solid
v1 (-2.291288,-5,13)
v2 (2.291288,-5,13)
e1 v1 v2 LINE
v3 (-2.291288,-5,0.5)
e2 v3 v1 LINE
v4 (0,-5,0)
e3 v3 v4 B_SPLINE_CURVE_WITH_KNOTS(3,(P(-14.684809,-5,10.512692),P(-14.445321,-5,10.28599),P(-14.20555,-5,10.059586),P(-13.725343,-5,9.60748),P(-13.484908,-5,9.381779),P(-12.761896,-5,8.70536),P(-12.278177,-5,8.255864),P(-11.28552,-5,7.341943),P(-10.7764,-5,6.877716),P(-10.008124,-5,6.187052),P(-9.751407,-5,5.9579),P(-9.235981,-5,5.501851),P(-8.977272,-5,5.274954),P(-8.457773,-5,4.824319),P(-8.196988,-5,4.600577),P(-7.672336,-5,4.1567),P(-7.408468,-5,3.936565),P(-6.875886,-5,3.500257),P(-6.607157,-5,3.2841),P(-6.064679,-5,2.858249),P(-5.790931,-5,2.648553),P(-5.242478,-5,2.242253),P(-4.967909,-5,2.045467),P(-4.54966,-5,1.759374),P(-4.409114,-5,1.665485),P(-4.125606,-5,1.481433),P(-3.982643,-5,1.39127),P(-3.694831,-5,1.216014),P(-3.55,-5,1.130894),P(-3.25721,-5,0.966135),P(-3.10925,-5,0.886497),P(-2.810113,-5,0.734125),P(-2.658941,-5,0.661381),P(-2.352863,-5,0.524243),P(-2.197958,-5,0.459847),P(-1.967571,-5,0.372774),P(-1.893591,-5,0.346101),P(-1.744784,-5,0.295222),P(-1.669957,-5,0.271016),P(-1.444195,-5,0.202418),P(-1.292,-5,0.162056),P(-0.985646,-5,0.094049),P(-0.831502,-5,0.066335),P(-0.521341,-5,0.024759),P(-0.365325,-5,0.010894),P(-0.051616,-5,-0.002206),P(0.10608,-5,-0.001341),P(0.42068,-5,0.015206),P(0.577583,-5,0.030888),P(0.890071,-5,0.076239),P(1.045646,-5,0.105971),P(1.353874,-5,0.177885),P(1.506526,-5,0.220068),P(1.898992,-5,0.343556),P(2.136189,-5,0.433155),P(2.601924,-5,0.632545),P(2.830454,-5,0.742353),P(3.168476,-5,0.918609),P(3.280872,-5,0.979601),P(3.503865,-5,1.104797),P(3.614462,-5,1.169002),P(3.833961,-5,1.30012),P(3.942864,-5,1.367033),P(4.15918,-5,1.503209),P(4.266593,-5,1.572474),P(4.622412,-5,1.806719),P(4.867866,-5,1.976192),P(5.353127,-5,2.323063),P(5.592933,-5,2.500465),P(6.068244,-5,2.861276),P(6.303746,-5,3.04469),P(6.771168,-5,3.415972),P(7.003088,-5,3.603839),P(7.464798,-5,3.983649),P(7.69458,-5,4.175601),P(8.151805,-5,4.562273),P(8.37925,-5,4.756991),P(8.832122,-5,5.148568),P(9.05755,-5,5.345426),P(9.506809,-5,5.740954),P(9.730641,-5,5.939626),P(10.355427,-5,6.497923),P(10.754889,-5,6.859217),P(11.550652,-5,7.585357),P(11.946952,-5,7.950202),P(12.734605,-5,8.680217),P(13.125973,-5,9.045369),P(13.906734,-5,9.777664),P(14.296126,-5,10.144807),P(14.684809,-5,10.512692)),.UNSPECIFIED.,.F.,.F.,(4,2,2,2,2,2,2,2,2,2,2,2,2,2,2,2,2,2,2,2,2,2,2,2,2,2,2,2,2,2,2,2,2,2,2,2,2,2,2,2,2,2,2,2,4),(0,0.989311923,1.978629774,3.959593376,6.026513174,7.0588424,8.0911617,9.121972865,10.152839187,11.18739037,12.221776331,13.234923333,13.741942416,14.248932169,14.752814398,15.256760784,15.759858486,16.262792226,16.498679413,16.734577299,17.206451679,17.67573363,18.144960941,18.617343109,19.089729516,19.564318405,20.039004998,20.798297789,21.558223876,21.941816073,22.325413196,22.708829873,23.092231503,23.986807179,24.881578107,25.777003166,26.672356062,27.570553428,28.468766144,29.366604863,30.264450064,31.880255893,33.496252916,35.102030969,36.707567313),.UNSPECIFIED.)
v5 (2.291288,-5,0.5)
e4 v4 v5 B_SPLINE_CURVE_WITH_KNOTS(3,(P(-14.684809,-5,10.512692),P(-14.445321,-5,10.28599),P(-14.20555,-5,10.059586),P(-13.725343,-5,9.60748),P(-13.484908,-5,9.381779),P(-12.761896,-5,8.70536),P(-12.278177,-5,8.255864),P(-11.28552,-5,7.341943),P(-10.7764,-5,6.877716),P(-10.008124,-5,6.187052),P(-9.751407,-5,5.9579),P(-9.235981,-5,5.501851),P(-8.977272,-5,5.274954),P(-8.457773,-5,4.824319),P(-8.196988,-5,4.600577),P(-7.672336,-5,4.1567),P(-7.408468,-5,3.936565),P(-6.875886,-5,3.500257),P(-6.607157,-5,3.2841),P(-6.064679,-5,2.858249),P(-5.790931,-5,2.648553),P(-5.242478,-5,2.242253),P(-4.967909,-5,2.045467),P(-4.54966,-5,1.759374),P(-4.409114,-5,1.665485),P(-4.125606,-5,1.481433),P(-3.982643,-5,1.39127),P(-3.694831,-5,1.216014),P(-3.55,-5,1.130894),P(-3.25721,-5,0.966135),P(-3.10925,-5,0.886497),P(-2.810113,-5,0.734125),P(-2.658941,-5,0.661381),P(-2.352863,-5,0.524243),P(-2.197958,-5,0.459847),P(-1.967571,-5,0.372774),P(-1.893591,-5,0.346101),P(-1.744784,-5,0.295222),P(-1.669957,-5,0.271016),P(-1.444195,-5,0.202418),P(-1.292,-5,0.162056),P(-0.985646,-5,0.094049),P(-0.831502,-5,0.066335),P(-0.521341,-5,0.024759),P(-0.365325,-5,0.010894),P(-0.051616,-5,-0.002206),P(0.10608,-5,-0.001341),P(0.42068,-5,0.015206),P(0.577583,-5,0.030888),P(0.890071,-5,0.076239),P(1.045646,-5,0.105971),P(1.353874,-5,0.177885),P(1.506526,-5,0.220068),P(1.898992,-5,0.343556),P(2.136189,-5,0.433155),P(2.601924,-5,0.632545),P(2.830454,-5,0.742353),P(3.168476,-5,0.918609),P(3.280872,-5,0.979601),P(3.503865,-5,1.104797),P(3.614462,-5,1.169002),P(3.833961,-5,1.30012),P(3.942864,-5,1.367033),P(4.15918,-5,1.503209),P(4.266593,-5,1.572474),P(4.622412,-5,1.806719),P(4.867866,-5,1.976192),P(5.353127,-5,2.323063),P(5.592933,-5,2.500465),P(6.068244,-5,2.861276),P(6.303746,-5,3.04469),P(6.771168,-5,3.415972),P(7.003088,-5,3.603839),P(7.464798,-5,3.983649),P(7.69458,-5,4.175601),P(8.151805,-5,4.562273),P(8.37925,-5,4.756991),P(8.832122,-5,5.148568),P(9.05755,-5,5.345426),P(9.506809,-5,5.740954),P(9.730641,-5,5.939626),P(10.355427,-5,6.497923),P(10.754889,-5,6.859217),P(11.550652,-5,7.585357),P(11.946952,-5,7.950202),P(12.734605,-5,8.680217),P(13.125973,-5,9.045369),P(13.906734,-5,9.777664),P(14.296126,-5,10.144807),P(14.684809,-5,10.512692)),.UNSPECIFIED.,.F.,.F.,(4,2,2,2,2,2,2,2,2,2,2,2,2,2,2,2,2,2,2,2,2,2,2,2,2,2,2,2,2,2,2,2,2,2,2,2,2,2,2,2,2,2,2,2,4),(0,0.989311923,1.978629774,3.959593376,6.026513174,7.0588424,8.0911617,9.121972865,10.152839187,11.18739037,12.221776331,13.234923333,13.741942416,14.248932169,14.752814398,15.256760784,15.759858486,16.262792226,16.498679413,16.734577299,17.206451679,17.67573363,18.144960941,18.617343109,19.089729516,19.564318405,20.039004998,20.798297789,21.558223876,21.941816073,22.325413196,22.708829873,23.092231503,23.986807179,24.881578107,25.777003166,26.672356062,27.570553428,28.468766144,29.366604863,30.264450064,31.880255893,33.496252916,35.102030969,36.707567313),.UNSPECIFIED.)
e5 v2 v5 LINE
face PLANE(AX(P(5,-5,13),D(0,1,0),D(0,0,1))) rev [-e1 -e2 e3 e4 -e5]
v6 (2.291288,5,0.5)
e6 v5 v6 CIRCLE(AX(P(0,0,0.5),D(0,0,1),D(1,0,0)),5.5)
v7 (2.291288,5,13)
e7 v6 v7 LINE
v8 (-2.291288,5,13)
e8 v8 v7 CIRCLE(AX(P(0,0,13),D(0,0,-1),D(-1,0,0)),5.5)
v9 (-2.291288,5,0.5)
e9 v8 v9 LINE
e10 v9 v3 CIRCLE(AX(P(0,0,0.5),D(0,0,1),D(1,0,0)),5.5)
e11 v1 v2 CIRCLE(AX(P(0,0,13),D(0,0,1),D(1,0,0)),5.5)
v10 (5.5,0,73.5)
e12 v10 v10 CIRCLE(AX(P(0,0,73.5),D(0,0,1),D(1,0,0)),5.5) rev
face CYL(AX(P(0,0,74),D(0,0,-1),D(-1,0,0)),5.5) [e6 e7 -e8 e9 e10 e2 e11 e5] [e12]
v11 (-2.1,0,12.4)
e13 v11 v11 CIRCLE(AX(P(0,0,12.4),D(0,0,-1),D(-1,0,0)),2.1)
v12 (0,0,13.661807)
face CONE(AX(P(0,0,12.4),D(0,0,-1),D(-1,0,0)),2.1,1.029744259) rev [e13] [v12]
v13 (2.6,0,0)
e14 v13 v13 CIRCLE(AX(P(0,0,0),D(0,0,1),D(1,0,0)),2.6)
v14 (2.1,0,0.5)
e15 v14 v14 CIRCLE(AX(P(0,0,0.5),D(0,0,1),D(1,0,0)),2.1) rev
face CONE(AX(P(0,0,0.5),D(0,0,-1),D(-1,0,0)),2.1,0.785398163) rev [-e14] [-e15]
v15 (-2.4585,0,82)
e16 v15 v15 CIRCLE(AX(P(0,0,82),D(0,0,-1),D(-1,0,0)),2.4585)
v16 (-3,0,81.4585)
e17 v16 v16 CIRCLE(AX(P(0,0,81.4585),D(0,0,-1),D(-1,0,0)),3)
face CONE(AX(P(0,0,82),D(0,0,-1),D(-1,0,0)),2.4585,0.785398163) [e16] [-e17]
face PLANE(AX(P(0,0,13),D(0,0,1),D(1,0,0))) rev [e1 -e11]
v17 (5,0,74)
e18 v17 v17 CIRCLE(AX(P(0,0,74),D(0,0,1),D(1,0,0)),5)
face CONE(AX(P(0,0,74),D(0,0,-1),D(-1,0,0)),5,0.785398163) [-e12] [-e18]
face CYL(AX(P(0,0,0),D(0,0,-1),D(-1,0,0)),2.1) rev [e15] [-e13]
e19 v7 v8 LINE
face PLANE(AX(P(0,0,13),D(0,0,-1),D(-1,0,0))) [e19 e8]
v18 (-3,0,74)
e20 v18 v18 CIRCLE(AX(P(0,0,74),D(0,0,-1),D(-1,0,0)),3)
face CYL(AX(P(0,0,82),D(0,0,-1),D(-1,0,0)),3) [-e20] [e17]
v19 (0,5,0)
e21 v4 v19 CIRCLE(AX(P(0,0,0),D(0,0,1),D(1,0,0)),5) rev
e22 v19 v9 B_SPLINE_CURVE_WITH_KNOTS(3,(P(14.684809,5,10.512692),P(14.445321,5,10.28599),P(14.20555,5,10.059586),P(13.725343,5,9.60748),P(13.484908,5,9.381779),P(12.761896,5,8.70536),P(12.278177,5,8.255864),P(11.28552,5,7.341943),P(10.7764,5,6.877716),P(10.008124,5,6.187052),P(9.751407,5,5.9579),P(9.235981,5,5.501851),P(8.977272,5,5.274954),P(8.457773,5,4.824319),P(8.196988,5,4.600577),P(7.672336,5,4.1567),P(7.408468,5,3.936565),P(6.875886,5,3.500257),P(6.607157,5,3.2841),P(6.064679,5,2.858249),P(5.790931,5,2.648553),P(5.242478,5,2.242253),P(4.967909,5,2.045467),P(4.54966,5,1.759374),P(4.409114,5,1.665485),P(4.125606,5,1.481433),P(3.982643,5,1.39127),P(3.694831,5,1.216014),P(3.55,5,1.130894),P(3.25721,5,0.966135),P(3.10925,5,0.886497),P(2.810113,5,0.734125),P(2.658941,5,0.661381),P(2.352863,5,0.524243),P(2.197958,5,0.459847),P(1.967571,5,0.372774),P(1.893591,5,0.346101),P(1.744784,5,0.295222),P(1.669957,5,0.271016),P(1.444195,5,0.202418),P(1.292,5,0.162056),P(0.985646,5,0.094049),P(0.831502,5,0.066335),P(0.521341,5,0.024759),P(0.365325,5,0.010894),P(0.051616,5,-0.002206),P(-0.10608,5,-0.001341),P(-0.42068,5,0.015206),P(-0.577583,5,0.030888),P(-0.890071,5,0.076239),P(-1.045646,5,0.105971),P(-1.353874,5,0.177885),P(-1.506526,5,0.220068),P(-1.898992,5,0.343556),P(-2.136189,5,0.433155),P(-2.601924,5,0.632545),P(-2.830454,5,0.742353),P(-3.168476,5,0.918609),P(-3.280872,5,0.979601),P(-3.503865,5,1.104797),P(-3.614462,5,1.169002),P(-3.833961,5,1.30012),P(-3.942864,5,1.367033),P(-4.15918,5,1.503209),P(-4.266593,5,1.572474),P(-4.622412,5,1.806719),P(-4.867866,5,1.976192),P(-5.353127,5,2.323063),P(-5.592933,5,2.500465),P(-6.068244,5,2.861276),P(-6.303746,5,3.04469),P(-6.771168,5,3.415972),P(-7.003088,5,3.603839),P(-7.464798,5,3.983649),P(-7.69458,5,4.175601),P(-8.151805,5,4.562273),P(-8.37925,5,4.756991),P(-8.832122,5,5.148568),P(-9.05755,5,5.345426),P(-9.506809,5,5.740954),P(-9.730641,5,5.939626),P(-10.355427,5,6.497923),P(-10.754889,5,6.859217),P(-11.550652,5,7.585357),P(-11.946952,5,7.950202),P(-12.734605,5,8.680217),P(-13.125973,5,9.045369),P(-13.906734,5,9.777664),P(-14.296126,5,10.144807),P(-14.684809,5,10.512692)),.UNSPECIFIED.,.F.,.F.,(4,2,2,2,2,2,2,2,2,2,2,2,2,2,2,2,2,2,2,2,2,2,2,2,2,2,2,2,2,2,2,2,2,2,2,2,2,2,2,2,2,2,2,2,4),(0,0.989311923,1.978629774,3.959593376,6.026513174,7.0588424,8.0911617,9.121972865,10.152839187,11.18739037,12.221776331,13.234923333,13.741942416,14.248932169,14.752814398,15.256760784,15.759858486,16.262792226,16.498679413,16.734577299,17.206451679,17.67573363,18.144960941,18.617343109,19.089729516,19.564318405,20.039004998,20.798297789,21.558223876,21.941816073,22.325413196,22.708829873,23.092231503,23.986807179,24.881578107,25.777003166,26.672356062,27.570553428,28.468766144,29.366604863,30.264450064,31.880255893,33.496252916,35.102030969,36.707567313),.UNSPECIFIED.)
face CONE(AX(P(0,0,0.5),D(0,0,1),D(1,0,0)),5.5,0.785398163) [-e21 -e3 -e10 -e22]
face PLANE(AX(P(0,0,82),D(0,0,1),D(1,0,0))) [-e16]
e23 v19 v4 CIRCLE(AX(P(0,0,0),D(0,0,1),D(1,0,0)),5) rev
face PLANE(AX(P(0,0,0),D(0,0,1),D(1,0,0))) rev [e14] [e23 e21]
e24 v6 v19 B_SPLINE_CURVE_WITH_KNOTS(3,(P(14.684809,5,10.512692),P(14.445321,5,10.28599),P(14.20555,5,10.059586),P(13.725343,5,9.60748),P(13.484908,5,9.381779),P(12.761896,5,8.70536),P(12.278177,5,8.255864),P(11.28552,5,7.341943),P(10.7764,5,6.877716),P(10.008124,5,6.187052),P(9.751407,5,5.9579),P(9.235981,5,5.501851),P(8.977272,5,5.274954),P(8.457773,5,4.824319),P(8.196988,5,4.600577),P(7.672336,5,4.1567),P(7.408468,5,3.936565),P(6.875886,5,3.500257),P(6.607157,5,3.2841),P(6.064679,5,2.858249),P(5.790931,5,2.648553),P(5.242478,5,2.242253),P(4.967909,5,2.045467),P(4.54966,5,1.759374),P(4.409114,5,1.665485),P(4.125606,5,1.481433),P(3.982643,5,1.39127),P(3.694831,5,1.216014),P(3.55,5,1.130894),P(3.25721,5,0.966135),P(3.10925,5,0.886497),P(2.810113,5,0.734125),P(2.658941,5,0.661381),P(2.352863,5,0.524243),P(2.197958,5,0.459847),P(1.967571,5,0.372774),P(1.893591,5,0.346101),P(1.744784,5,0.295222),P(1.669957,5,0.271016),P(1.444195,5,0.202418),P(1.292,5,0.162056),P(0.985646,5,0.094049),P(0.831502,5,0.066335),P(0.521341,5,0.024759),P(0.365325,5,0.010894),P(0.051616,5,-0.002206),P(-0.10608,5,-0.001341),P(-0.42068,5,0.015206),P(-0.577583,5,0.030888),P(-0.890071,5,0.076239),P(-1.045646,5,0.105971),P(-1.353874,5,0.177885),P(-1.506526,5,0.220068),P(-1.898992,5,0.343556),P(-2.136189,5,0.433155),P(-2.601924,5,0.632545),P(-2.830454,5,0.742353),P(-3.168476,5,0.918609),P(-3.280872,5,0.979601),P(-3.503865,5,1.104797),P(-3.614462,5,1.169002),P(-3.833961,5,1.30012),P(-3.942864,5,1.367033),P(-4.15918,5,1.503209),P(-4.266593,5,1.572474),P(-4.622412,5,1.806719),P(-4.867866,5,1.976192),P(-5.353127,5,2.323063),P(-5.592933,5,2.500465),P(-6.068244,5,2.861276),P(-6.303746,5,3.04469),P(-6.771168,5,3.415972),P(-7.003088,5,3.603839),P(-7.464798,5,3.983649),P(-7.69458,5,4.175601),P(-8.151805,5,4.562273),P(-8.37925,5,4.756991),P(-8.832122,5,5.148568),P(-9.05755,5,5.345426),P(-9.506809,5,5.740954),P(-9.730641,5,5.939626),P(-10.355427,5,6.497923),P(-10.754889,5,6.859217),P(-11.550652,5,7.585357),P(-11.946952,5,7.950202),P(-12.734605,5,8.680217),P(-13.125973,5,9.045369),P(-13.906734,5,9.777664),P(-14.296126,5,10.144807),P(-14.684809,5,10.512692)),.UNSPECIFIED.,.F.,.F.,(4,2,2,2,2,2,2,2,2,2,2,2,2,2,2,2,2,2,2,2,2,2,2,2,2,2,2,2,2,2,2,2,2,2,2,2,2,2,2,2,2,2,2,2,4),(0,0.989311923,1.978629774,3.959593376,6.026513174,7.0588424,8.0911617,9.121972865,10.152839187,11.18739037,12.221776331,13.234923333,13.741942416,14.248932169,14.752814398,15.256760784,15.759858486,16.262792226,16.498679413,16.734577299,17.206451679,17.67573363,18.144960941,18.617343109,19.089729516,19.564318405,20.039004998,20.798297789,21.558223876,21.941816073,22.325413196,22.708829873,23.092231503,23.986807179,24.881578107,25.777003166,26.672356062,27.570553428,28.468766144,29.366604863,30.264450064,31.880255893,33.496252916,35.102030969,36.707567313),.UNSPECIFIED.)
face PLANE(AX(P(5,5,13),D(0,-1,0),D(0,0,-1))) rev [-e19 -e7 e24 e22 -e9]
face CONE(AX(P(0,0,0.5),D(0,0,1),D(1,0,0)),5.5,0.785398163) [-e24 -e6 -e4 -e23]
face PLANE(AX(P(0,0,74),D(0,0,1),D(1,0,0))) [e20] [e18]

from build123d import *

# Parameters (mm, degrees)
SKETCH_1_R             = 5.5
EXTRUDE_1_DEPTH        = 74
CHAMFER_1_SIZE         = 0.5
SKETCH_2_R             = 3.3
EXTRUDE_2_DEPTH        = 8
HOLE_WIZARD_M5_1_D     = 4.2
HOLE_WIZARD_M5_1_DEPTH = 12.4
HOLE_WIZARD_M5_1_TIP   = 1.2618073
CHAMFER_3_SIZE         = 0.5
SKETCH_6_W             = 10
SKETCH_6_H             = 3
CUT_EXTRUDE_1_DEPTH    = 13


# Read off the part's stored shape, not the designer's step: M6 机械螺纹 螺柱1
with BuildPart() as part:
    # 草图1 → 拉伸1 (new body)
    with BuildSketch(Plane.XY):
        Circle(SKETCH_1_R)
    extrude(amount=EXTRUDE_1_DEPTH)

    # 倒角1
    chamfer_1_edges = [part.edges().sort_by_distance(p)[0] for p in [
        (-5.5, 0, 0),
        (-5.5, 0, 74),
    ]]
    chamfer(chamfer_1_edges, length=CHAMFER_1_SIZE)

    # 草图2 → 拉伸2 (add)
    with BuildSketch(Plane.XY.offset(74)):
        Circle(SKETCH_2_R)
    extrude(amount=EXTRUDE_2_DEPTH)

    # M5 螺纹孔1
    with Locations(Plane(origin=(0, 0, 0), x_dir=(-1, 0, 0), z_dir=(0, 0, -1))):
        with Locations((0, 0)):
            Hole(HOLE_WIZARD_M5_1_D / 2, depth=HOLE_WIZARD_M5_1_DEPTH)
            with Locations((0, 0, -(HOLE_WIZARD_M5_1_DEPTH + HOLE_WIZARD_M5_1_TIP / 2))):  # 118° drill point
                Cone(0, HOLE_WIZARD_M5_1_D / 2, HOLE_WIZARD_M5_1_TIP, mode=Mode.SUBTRACT)

    # 倒角3
    chamfer_3_edges = [part.edges().sort_by_distance(p)[0] for p in [
        (-2.1, 0, 0),
    ]]
    chamfer(chamfer_3_edges, length=CHAMFER_3_SIZE)

    # 草图6 → 切除-拉伸1 (cut)
    with BuildSketch(Plane(origin=(0, 0, 0), x_dir=(-1, 0, 0), z_dir=(0, 0, -1))):
        with Locations((0, 6.5)):
            Rectangle(SKETCH_6_W, SKETCH_6_H)
        with Locations((0, -6.5)):
            Rectangle(SKETCH_6_W, SKETCH_6_H)
    extrude(amount=-CUT_EXTRUDE_1_DEPTH, mode=Mode.SUBTRACT)

    # M6 机械螺纹 螺柱1 outline → M6 机械螺纹 螺柱1 (revolve, cut)
    with BuildSketch(Plane.XZ):
        Polygon((3.3, 82), (2.4585, 82), (3, 81.4585), (3, 74), (3.3, 74), align=None)
    revolve(axis=Axis((0, 0, 0), (0, 0, 1)), mode=Mode.SUBTRACT)


solid = part.part
